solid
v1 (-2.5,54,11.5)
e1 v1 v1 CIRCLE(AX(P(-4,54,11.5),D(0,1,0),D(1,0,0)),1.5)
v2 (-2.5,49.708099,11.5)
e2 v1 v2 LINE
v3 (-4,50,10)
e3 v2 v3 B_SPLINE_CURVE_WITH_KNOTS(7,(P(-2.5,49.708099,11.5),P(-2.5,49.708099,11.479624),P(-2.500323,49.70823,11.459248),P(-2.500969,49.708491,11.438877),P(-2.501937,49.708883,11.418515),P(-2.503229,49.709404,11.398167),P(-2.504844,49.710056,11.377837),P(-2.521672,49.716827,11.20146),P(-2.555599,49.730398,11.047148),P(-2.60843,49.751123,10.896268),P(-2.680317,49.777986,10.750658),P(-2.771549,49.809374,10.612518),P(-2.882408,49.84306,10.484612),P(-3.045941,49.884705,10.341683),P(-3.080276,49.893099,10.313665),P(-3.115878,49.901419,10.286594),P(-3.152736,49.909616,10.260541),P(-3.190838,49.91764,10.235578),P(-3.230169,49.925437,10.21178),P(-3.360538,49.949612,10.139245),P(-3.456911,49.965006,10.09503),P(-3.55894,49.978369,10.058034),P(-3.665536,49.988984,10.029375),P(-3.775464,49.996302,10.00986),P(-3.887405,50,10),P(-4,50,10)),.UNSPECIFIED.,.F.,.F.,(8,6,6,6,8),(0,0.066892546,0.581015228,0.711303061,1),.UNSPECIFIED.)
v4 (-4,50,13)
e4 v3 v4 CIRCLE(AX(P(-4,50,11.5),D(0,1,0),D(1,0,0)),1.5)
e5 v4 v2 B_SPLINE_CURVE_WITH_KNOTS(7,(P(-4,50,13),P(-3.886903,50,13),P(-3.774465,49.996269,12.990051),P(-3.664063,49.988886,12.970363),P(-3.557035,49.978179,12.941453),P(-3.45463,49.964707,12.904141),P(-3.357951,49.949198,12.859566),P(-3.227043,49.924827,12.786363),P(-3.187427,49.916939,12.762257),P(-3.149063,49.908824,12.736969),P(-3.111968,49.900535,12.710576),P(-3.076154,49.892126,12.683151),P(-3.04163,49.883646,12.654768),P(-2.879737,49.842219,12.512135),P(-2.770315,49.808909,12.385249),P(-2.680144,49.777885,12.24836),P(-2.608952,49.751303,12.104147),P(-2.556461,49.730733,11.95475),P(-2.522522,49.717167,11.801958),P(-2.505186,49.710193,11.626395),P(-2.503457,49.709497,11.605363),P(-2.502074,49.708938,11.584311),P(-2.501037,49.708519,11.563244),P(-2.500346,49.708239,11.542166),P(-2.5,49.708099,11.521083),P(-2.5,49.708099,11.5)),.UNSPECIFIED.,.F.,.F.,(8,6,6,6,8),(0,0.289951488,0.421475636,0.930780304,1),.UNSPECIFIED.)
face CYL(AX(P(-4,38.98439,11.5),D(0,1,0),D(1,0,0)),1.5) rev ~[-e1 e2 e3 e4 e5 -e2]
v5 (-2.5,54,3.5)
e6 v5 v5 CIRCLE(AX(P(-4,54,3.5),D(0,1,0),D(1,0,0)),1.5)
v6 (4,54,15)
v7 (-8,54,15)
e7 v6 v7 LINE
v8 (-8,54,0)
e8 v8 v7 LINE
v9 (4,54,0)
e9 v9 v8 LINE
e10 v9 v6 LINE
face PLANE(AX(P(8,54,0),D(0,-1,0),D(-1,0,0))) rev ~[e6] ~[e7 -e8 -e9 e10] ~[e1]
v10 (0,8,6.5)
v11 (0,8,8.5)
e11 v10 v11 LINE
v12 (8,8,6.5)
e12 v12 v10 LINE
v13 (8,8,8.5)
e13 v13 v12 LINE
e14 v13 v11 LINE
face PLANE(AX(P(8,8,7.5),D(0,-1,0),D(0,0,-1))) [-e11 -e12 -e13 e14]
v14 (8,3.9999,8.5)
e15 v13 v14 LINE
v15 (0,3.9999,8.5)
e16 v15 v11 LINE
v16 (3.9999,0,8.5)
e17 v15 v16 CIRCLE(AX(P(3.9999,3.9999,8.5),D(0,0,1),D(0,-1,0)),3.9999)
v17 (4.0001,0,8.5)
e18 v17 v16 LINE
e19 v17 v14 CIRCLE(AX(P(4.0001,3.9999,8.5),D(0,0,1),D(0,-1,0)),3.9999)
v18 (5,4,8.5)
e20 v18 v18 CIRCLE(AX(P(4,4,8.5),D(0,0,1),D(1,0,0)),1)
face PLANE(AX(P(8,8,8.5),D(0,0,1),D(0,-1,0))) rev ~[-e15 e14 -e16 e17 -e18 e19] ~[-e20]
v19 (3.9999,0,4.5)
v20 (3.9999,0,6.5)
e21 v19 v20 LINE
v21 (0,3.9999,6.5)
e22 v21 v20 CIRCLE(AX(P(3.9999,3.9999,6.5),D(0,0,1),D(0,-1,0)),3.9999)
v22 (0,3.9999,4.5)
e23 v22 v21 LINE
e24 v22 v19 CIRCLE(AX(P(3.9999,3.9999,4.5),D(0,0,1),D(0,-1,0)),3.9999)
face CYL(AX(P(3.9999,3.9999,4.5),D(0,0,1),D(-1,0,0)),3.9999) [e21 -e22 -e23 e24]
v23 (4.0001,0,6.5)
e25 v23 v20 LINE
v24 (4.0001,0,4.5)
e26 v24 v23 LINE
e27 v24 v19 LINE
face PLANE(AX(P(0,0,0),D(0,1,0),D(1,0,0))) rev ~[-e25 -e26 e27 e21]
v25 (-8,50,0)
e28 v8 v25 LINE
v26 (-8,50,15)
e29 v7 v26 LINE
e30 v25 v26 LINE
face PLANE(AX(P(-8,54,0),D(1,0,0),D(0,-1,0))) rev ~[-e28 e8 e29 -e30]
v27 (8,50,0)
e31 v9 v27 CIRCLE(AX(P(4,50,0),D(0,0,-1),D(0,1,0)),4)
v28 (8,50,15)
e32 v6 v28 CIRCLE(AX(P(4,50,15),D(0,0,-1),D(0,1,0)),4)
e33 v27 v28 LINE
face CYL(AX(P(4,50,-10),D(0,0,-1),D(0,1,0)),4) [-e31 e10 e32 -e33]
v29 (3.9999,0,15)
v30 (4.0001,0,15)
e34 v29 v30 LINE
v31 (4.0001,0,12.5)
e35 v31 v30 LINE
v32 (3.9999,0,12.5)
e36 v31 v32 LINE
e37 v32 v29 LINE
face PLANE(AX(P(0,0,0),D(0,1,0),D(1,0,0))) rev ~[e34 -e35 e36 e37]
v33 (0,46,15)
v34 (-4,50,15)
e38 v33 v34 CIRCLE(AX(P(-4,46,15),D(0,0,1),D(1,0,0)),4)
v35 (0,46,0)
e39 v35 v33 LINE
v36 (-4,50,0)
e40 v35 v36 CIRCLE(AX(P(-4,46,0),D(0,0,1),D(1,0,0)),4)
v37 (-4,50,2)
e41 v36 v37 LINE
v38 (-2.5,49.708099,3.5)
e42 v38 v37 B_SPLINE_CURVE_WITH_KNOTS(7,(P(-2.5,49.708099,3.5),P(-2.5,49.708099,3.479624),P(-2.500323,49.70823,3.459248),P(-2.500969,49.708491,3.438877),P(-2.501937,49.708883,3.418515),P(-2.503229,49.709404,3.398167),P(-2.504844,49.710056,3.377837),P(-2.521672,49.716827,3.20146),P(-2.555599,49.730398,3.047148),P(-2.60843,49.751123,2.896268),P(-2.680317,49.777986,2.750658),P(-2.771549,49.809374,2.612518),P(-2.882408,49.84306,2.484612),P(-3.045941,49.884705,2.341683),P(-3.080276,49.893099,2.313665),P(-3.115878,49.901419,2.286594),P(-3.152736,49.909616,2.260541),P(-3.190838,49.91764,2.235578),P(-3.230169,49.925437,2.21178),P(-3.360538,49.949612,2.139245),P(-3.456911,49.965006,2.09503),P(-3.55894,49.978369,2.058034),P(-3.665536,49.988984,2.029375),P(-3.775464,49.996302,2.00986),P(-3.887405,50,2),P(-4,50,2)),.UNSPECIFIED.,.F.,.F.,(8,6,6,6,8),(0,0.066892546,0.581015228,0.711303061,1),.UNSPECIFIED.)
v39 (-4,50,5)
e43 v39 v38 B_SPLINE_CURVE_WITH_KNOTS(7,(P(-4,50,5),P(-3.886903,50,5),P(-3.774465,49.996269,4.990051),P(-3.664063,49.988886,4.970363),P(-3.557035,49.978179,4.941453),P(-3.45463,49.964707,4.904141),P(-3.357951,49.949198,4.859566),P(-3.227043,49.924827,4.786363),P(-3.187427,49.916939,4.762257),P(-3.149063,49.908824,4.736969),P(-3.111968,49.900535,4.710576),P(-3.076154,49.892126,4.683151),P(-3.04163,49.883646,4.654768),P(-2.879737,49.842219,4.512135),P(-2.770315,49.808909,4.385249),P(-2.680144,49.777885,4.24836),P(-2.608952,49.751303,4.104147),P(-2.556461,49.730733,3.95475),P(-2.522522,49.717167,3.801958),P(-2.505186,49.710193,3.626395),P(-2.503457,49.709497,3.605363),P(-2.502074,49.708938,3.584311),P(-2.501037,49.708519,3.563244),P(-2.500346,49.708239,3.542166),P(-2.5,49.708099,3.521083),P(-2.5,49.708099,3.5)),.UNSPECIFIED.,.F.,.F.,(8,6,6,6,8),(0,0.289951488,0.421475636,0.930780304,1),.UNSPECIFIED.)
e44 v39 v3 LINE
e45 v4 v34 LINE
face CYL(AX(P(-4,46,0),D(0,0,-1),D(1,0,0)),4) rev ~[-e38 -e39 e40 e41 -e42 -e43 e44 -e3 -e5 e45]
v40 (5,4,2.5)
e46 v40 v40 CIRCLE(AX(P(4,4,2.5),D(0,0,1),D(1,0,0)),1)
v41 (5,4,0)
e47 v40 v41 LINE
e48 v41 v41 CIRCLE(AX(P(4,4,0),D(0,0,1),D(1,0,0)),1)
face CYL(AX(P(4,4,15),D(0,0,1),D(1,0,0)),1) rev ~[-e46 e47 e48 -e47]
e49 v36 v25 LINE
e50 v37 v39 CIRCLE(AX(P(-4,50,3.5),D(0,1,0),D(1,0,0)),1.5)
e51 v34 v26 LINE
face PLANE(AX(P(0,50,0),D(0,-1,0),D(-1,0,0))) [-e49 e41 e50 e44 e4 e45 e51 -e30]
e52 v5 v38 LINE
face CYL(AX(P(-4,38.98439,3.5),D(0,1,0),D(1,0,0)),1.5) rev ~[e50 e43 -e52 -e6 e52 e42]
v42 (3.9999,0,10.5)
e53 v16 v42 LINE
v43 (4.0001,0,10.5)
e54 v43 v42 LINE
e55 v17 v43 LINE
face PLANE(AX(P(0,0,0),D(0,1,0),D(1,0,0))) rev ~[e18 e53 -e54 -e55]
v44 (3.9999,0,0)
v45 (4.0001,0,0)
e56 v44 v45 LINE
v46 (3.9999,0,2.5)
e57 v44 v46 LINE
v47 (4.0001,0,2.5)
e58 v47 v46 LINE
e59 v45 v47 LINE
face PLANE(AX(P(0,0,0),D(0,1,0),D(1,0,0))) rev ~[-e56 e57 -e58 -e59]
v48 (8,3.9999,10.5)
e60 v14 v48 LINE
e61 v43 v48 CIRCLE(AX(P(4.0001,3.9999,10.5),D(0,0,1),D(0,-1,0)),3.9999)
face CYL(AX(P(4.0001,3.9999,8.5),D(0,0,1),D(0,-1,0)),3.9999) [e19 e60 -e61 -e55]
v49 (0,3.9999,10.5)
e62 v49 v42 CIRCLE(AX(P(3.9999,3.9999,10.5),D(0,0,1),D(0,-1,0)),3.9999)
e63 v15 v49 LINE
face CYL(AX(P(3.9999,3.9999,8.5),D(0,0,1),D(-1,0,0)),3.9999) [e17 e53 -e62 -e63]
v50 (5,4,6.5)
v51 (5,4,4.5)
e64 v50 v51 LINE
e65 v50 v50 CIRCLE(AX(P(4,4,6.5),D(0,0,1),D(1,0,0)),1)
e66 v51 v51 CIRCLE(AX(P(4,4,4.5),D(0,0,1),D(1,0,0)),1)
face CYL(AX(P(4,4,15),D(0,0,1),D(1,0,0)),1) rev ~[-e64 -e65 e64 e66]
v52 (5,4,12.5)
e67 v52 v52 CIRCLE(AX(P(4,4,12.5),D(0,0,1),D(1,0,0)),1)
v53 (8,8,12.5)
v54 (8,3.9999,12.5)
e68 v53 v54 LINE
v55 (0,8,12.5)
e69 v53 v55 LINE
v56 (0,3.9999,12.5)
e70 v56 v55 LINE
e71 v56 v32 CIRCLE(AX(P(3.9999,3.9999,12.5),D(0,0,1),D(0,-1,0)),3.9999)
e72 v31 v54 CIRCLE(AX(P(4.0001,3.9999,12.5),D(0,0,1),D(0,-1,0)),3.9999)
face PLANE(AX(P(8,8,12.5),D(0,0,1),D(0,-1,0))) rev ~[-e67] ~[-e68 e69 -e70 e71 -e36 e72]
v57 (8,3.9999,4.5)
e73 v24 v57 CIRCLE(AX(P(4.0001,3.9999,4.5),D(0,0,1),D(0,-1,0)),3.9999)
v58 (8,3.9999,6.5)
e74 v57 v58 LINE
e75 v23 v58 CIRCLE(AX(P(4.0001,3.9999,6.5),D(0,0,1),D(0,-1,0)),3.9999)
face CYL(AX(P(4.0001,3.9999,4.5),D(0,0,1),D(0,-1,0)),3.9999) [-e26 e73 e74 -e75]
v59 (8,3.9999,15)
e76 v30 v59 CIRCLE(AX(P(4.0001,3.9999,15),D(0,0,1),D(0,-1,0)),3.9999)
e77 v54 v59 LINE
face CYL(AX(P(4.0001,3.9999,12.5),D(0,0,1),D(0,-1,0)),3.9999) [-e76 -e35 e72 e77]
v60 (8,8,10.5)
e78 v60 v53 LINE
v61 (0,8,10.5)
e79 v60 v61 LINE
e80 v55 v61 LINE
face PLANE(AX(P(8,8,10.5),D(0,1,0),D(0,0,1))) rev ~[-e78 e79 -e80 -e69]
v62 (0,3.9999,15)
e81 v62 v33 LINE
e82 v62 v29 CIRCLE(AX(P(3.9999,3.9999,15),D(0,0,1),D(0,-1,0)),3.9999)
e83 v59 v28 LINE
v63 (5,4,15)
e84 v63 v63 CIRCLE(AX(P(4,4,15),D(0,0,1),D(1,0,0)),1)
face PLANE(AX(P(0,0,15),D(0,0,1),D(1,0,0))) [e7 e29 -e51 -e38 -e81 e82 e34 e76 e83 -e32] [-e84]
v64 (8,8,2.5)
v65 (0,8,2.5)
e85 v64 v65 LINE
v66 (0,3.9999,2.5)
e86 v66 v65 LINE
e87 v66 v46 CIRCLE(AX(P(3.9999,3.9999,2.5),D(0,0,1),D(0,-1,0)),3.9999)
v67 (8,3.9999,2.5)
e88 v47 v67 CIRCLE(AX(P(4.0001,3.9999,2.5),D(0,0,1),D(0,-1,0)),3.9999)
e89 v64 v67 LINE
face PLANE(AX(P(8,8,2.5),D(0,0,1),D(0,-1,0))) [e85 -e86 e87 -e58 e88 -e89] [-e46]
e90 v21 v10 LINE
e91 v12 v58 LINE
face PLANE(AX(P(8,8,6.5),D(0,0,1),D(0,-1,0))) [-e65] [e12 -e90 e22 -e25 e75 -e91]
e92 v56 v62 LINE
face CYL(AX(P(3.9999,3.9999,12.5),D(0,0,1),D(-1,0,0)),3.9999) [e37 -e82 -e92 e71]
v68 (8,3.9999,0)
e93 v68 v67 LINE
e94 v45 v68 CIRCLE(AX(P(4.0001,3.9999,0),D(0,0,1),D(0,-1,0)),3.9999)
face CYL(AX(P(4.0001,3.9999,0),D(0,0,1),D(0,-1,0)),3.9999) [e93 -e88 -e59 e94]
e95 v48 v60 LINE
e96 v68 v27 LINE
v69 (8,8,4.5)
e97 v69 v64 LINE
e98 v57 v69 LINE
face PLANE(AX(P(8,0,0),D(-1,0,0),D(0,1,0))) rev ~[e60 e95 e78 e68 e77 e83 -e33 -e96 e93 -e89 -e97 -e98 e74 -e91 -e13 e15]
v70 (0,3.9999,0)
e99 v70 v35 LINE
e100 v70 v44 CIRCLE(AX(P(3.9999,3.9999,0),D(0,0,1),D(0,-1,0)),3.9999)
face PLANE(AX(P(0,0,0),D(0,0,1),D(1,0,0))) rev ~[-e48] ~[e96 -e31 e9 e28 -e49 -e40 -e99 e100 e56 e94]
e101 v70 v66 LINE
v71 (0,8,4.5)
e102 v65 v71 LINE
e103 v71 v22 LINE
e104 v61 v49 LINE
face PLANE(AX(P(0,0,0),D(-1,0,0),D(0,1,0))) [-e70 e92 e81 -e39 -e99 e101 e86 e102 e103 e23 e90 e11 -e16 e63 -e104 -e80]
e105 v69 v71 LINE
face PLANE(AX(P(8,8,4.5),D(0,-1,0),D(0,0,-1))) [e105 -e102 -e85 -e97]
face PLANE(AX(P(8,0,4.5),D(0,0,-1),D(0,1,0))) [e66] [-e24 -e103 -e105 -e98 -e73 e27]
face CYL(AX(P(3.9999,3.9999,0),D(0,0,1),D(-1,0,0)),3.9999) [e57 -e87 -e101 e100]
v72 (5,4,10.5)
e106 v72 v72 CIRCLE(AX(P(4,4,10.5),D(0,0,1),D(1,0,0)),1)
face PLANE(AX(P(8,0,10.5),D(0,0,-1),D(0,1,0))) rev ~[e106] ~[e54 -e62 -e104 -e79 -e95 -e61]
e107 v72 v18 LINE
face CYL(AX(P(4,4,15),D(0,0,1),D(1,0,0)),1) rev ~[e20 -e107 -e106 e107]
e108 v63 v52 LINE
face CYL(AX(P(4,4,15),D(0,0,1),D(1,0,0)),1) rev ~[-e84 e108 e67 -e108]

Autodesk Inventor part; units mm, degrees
ref_plane "YZ Plane" through (0, 0, 0) normal (1, 0, 0) x (0, 1, 0)
ref_plane "XZ Plane" through (0, 0, 0) normal (0, 1, 0) x (-1, 0, 0)
ref_plane "XY Plane" through (0, 0, 0) normal (0, 0, 1) x (1, 0, 0)
sketch "Sketch1" plane through (0, 0, 0) normal (0, 0, 1) x (1, 0, 0)
  line L0 (0, 0) -> (0, 50)
  line L1 (0, 50) -> (-8, 50)
  line L2 (0, 0) -> (8, 0)
  line L3 (8, 0) -> (8, 54)
  line L4 (8, 54) -> (-8, 54)
  line L5 (8, 54) -> (-8, 54)
  line L6 (-8, 54) -> (-8, 50)
  dimension "d0" = 50
  dimension "d3" = 8
  dimension "d7" = 54
  dimension "d28" = 16
extrude "Extrusion1" add sketch "Sketch1" along normal blind 15
sketch "Sketch2" plane through (-8, 54, 0) normal (0, 1, 0) x (1, 0, 0)
  line L0 (16, 0) -> (0, 0) construction
  line L1 (1.2766, 0) -> (1.2766, -15) construction
  line L2 (16, -15) -> (0, -15) construction
  line L3 (1.2766, 0) -> (1.2766, -2.75) construction
  line L4 (1.2766, -15) -> (1.2766, -12.25) construction
  line L5 (1.2766, 0) -> (1.2766, -3.5) construction
  line L6 (1.2766, -15) -> (1.2766, -11.5) construction
  line L7 (8, 0) -> (0, 0) construction
  line L8 (0, 0) -> (0, -15) construction
  line L9 (4, 0) -> (4, -15) construction
  line L10 (4, -15) -> (4, -11.5) construction
  line L11 (4, 0) -> (4, -3.5) construction
  circle A0 centre (4, -3.5) radius 1.5
  circle A1 centre (4, -11.5) radius 1.5
  dimension "d12" = 3.5
  dimension "d13" = 3.5
  dimension "d29" = 3.5
  dimension "d30" = 3.5
  dimension "d31" = 3
  dimension "d32" = 3
extrude "Extrusion2" cut sketch "Sketch2" against normal blind 8.75
sketch "Sketch3" plane through (8, 0, 0) normal (1, 0, 0) x (0, 0, -1)
  line L0 (0, 0) -> (-15, 0) construction
  line L1 (-7.5, 0) -> (-7.5, 8) construction
  line L2 (-7.5, 8) -> (-6.5, 8)
  line L3 (-6.5, 8) -> (-8.5, 8)
  line L4 (-8.5, 8) -> (-8.5, 0)
  line L5 (-6.5, 8) -> (-6.5, 0)
  line L6 (-6.5, 0) -> (-4.5, 0)
  line L7 (-4.5, 0) -> (-4.5, 8)
  line L8 (-4.5, 8) -> (-2.5, 8)
  line L9 (-2.5, 8) -> (-2.5, 0)
  line L10 (-8.5, 0) -> (-10.5, 0)
  line L11 (-10.5, 0) -> (-10.5, 8)
  line L12 (-10.5, 8) -> (-12.5, 8)
  line L13 (-12.5, 8) -> (-12.5, 0)
  line L14 (-2.5, 0) -> (0, 0)
  line L15 (-12.5, 0) -> (-15, 0)
  line L16 (-15, 0) -> (-15, 10)
  line L17 (-15, 50) -> (-15, 0) projected
  line L18 (-15, 10) -> (0, 10)
  line L19 (0, 50) -> (0, 0) projected
  line L20 (0, 0) -> (0, 10)
  line L21 (-15, 0) -> (0, 0)
  dimension "d18" = 8
  dimension "d19" = 1
  dimension "d20" = 2
  dimension "d21" = 2
  dimension "d22" = 2
  dimension "d23" = 2
  dimension "d24" = 2
  dimension "d25" = 10
extrude "Extrusion3" cut sketch "Sketch3" against normal blind 10.25 contours L2 L5 L21 L4 L3 | L7 L8 L9 L21 | L21 L13 L12 L11
fillet "Fillet1" radius 4 8 edges at (8, 0, 1.25) (8, 0, 5.5) (8, 0, 9.5) (8, 0, 13.75) (0, 0, 13.75) (0, 0, 9.5) (0, 0, 5.5) (0, 0, 1.25)
sketch "Sketch4" plane through (0, 0, 15) normal (0, 0, 1) x (1, 0, 0)
  line L0 (0, 4) -> (8, 4) construction
  circle A0 centre (4, 4) radius 1
  point P0 (0, 0)
  dimension "d34" = 2
extrude "Extrusion4" cut sketch "Sketch4" against normal blind 21
fillet "Fillet2" radius 4 2 edges at (8, 54, 7.5) (0, 50, 7.5)
properties part number "WebcamArm"
